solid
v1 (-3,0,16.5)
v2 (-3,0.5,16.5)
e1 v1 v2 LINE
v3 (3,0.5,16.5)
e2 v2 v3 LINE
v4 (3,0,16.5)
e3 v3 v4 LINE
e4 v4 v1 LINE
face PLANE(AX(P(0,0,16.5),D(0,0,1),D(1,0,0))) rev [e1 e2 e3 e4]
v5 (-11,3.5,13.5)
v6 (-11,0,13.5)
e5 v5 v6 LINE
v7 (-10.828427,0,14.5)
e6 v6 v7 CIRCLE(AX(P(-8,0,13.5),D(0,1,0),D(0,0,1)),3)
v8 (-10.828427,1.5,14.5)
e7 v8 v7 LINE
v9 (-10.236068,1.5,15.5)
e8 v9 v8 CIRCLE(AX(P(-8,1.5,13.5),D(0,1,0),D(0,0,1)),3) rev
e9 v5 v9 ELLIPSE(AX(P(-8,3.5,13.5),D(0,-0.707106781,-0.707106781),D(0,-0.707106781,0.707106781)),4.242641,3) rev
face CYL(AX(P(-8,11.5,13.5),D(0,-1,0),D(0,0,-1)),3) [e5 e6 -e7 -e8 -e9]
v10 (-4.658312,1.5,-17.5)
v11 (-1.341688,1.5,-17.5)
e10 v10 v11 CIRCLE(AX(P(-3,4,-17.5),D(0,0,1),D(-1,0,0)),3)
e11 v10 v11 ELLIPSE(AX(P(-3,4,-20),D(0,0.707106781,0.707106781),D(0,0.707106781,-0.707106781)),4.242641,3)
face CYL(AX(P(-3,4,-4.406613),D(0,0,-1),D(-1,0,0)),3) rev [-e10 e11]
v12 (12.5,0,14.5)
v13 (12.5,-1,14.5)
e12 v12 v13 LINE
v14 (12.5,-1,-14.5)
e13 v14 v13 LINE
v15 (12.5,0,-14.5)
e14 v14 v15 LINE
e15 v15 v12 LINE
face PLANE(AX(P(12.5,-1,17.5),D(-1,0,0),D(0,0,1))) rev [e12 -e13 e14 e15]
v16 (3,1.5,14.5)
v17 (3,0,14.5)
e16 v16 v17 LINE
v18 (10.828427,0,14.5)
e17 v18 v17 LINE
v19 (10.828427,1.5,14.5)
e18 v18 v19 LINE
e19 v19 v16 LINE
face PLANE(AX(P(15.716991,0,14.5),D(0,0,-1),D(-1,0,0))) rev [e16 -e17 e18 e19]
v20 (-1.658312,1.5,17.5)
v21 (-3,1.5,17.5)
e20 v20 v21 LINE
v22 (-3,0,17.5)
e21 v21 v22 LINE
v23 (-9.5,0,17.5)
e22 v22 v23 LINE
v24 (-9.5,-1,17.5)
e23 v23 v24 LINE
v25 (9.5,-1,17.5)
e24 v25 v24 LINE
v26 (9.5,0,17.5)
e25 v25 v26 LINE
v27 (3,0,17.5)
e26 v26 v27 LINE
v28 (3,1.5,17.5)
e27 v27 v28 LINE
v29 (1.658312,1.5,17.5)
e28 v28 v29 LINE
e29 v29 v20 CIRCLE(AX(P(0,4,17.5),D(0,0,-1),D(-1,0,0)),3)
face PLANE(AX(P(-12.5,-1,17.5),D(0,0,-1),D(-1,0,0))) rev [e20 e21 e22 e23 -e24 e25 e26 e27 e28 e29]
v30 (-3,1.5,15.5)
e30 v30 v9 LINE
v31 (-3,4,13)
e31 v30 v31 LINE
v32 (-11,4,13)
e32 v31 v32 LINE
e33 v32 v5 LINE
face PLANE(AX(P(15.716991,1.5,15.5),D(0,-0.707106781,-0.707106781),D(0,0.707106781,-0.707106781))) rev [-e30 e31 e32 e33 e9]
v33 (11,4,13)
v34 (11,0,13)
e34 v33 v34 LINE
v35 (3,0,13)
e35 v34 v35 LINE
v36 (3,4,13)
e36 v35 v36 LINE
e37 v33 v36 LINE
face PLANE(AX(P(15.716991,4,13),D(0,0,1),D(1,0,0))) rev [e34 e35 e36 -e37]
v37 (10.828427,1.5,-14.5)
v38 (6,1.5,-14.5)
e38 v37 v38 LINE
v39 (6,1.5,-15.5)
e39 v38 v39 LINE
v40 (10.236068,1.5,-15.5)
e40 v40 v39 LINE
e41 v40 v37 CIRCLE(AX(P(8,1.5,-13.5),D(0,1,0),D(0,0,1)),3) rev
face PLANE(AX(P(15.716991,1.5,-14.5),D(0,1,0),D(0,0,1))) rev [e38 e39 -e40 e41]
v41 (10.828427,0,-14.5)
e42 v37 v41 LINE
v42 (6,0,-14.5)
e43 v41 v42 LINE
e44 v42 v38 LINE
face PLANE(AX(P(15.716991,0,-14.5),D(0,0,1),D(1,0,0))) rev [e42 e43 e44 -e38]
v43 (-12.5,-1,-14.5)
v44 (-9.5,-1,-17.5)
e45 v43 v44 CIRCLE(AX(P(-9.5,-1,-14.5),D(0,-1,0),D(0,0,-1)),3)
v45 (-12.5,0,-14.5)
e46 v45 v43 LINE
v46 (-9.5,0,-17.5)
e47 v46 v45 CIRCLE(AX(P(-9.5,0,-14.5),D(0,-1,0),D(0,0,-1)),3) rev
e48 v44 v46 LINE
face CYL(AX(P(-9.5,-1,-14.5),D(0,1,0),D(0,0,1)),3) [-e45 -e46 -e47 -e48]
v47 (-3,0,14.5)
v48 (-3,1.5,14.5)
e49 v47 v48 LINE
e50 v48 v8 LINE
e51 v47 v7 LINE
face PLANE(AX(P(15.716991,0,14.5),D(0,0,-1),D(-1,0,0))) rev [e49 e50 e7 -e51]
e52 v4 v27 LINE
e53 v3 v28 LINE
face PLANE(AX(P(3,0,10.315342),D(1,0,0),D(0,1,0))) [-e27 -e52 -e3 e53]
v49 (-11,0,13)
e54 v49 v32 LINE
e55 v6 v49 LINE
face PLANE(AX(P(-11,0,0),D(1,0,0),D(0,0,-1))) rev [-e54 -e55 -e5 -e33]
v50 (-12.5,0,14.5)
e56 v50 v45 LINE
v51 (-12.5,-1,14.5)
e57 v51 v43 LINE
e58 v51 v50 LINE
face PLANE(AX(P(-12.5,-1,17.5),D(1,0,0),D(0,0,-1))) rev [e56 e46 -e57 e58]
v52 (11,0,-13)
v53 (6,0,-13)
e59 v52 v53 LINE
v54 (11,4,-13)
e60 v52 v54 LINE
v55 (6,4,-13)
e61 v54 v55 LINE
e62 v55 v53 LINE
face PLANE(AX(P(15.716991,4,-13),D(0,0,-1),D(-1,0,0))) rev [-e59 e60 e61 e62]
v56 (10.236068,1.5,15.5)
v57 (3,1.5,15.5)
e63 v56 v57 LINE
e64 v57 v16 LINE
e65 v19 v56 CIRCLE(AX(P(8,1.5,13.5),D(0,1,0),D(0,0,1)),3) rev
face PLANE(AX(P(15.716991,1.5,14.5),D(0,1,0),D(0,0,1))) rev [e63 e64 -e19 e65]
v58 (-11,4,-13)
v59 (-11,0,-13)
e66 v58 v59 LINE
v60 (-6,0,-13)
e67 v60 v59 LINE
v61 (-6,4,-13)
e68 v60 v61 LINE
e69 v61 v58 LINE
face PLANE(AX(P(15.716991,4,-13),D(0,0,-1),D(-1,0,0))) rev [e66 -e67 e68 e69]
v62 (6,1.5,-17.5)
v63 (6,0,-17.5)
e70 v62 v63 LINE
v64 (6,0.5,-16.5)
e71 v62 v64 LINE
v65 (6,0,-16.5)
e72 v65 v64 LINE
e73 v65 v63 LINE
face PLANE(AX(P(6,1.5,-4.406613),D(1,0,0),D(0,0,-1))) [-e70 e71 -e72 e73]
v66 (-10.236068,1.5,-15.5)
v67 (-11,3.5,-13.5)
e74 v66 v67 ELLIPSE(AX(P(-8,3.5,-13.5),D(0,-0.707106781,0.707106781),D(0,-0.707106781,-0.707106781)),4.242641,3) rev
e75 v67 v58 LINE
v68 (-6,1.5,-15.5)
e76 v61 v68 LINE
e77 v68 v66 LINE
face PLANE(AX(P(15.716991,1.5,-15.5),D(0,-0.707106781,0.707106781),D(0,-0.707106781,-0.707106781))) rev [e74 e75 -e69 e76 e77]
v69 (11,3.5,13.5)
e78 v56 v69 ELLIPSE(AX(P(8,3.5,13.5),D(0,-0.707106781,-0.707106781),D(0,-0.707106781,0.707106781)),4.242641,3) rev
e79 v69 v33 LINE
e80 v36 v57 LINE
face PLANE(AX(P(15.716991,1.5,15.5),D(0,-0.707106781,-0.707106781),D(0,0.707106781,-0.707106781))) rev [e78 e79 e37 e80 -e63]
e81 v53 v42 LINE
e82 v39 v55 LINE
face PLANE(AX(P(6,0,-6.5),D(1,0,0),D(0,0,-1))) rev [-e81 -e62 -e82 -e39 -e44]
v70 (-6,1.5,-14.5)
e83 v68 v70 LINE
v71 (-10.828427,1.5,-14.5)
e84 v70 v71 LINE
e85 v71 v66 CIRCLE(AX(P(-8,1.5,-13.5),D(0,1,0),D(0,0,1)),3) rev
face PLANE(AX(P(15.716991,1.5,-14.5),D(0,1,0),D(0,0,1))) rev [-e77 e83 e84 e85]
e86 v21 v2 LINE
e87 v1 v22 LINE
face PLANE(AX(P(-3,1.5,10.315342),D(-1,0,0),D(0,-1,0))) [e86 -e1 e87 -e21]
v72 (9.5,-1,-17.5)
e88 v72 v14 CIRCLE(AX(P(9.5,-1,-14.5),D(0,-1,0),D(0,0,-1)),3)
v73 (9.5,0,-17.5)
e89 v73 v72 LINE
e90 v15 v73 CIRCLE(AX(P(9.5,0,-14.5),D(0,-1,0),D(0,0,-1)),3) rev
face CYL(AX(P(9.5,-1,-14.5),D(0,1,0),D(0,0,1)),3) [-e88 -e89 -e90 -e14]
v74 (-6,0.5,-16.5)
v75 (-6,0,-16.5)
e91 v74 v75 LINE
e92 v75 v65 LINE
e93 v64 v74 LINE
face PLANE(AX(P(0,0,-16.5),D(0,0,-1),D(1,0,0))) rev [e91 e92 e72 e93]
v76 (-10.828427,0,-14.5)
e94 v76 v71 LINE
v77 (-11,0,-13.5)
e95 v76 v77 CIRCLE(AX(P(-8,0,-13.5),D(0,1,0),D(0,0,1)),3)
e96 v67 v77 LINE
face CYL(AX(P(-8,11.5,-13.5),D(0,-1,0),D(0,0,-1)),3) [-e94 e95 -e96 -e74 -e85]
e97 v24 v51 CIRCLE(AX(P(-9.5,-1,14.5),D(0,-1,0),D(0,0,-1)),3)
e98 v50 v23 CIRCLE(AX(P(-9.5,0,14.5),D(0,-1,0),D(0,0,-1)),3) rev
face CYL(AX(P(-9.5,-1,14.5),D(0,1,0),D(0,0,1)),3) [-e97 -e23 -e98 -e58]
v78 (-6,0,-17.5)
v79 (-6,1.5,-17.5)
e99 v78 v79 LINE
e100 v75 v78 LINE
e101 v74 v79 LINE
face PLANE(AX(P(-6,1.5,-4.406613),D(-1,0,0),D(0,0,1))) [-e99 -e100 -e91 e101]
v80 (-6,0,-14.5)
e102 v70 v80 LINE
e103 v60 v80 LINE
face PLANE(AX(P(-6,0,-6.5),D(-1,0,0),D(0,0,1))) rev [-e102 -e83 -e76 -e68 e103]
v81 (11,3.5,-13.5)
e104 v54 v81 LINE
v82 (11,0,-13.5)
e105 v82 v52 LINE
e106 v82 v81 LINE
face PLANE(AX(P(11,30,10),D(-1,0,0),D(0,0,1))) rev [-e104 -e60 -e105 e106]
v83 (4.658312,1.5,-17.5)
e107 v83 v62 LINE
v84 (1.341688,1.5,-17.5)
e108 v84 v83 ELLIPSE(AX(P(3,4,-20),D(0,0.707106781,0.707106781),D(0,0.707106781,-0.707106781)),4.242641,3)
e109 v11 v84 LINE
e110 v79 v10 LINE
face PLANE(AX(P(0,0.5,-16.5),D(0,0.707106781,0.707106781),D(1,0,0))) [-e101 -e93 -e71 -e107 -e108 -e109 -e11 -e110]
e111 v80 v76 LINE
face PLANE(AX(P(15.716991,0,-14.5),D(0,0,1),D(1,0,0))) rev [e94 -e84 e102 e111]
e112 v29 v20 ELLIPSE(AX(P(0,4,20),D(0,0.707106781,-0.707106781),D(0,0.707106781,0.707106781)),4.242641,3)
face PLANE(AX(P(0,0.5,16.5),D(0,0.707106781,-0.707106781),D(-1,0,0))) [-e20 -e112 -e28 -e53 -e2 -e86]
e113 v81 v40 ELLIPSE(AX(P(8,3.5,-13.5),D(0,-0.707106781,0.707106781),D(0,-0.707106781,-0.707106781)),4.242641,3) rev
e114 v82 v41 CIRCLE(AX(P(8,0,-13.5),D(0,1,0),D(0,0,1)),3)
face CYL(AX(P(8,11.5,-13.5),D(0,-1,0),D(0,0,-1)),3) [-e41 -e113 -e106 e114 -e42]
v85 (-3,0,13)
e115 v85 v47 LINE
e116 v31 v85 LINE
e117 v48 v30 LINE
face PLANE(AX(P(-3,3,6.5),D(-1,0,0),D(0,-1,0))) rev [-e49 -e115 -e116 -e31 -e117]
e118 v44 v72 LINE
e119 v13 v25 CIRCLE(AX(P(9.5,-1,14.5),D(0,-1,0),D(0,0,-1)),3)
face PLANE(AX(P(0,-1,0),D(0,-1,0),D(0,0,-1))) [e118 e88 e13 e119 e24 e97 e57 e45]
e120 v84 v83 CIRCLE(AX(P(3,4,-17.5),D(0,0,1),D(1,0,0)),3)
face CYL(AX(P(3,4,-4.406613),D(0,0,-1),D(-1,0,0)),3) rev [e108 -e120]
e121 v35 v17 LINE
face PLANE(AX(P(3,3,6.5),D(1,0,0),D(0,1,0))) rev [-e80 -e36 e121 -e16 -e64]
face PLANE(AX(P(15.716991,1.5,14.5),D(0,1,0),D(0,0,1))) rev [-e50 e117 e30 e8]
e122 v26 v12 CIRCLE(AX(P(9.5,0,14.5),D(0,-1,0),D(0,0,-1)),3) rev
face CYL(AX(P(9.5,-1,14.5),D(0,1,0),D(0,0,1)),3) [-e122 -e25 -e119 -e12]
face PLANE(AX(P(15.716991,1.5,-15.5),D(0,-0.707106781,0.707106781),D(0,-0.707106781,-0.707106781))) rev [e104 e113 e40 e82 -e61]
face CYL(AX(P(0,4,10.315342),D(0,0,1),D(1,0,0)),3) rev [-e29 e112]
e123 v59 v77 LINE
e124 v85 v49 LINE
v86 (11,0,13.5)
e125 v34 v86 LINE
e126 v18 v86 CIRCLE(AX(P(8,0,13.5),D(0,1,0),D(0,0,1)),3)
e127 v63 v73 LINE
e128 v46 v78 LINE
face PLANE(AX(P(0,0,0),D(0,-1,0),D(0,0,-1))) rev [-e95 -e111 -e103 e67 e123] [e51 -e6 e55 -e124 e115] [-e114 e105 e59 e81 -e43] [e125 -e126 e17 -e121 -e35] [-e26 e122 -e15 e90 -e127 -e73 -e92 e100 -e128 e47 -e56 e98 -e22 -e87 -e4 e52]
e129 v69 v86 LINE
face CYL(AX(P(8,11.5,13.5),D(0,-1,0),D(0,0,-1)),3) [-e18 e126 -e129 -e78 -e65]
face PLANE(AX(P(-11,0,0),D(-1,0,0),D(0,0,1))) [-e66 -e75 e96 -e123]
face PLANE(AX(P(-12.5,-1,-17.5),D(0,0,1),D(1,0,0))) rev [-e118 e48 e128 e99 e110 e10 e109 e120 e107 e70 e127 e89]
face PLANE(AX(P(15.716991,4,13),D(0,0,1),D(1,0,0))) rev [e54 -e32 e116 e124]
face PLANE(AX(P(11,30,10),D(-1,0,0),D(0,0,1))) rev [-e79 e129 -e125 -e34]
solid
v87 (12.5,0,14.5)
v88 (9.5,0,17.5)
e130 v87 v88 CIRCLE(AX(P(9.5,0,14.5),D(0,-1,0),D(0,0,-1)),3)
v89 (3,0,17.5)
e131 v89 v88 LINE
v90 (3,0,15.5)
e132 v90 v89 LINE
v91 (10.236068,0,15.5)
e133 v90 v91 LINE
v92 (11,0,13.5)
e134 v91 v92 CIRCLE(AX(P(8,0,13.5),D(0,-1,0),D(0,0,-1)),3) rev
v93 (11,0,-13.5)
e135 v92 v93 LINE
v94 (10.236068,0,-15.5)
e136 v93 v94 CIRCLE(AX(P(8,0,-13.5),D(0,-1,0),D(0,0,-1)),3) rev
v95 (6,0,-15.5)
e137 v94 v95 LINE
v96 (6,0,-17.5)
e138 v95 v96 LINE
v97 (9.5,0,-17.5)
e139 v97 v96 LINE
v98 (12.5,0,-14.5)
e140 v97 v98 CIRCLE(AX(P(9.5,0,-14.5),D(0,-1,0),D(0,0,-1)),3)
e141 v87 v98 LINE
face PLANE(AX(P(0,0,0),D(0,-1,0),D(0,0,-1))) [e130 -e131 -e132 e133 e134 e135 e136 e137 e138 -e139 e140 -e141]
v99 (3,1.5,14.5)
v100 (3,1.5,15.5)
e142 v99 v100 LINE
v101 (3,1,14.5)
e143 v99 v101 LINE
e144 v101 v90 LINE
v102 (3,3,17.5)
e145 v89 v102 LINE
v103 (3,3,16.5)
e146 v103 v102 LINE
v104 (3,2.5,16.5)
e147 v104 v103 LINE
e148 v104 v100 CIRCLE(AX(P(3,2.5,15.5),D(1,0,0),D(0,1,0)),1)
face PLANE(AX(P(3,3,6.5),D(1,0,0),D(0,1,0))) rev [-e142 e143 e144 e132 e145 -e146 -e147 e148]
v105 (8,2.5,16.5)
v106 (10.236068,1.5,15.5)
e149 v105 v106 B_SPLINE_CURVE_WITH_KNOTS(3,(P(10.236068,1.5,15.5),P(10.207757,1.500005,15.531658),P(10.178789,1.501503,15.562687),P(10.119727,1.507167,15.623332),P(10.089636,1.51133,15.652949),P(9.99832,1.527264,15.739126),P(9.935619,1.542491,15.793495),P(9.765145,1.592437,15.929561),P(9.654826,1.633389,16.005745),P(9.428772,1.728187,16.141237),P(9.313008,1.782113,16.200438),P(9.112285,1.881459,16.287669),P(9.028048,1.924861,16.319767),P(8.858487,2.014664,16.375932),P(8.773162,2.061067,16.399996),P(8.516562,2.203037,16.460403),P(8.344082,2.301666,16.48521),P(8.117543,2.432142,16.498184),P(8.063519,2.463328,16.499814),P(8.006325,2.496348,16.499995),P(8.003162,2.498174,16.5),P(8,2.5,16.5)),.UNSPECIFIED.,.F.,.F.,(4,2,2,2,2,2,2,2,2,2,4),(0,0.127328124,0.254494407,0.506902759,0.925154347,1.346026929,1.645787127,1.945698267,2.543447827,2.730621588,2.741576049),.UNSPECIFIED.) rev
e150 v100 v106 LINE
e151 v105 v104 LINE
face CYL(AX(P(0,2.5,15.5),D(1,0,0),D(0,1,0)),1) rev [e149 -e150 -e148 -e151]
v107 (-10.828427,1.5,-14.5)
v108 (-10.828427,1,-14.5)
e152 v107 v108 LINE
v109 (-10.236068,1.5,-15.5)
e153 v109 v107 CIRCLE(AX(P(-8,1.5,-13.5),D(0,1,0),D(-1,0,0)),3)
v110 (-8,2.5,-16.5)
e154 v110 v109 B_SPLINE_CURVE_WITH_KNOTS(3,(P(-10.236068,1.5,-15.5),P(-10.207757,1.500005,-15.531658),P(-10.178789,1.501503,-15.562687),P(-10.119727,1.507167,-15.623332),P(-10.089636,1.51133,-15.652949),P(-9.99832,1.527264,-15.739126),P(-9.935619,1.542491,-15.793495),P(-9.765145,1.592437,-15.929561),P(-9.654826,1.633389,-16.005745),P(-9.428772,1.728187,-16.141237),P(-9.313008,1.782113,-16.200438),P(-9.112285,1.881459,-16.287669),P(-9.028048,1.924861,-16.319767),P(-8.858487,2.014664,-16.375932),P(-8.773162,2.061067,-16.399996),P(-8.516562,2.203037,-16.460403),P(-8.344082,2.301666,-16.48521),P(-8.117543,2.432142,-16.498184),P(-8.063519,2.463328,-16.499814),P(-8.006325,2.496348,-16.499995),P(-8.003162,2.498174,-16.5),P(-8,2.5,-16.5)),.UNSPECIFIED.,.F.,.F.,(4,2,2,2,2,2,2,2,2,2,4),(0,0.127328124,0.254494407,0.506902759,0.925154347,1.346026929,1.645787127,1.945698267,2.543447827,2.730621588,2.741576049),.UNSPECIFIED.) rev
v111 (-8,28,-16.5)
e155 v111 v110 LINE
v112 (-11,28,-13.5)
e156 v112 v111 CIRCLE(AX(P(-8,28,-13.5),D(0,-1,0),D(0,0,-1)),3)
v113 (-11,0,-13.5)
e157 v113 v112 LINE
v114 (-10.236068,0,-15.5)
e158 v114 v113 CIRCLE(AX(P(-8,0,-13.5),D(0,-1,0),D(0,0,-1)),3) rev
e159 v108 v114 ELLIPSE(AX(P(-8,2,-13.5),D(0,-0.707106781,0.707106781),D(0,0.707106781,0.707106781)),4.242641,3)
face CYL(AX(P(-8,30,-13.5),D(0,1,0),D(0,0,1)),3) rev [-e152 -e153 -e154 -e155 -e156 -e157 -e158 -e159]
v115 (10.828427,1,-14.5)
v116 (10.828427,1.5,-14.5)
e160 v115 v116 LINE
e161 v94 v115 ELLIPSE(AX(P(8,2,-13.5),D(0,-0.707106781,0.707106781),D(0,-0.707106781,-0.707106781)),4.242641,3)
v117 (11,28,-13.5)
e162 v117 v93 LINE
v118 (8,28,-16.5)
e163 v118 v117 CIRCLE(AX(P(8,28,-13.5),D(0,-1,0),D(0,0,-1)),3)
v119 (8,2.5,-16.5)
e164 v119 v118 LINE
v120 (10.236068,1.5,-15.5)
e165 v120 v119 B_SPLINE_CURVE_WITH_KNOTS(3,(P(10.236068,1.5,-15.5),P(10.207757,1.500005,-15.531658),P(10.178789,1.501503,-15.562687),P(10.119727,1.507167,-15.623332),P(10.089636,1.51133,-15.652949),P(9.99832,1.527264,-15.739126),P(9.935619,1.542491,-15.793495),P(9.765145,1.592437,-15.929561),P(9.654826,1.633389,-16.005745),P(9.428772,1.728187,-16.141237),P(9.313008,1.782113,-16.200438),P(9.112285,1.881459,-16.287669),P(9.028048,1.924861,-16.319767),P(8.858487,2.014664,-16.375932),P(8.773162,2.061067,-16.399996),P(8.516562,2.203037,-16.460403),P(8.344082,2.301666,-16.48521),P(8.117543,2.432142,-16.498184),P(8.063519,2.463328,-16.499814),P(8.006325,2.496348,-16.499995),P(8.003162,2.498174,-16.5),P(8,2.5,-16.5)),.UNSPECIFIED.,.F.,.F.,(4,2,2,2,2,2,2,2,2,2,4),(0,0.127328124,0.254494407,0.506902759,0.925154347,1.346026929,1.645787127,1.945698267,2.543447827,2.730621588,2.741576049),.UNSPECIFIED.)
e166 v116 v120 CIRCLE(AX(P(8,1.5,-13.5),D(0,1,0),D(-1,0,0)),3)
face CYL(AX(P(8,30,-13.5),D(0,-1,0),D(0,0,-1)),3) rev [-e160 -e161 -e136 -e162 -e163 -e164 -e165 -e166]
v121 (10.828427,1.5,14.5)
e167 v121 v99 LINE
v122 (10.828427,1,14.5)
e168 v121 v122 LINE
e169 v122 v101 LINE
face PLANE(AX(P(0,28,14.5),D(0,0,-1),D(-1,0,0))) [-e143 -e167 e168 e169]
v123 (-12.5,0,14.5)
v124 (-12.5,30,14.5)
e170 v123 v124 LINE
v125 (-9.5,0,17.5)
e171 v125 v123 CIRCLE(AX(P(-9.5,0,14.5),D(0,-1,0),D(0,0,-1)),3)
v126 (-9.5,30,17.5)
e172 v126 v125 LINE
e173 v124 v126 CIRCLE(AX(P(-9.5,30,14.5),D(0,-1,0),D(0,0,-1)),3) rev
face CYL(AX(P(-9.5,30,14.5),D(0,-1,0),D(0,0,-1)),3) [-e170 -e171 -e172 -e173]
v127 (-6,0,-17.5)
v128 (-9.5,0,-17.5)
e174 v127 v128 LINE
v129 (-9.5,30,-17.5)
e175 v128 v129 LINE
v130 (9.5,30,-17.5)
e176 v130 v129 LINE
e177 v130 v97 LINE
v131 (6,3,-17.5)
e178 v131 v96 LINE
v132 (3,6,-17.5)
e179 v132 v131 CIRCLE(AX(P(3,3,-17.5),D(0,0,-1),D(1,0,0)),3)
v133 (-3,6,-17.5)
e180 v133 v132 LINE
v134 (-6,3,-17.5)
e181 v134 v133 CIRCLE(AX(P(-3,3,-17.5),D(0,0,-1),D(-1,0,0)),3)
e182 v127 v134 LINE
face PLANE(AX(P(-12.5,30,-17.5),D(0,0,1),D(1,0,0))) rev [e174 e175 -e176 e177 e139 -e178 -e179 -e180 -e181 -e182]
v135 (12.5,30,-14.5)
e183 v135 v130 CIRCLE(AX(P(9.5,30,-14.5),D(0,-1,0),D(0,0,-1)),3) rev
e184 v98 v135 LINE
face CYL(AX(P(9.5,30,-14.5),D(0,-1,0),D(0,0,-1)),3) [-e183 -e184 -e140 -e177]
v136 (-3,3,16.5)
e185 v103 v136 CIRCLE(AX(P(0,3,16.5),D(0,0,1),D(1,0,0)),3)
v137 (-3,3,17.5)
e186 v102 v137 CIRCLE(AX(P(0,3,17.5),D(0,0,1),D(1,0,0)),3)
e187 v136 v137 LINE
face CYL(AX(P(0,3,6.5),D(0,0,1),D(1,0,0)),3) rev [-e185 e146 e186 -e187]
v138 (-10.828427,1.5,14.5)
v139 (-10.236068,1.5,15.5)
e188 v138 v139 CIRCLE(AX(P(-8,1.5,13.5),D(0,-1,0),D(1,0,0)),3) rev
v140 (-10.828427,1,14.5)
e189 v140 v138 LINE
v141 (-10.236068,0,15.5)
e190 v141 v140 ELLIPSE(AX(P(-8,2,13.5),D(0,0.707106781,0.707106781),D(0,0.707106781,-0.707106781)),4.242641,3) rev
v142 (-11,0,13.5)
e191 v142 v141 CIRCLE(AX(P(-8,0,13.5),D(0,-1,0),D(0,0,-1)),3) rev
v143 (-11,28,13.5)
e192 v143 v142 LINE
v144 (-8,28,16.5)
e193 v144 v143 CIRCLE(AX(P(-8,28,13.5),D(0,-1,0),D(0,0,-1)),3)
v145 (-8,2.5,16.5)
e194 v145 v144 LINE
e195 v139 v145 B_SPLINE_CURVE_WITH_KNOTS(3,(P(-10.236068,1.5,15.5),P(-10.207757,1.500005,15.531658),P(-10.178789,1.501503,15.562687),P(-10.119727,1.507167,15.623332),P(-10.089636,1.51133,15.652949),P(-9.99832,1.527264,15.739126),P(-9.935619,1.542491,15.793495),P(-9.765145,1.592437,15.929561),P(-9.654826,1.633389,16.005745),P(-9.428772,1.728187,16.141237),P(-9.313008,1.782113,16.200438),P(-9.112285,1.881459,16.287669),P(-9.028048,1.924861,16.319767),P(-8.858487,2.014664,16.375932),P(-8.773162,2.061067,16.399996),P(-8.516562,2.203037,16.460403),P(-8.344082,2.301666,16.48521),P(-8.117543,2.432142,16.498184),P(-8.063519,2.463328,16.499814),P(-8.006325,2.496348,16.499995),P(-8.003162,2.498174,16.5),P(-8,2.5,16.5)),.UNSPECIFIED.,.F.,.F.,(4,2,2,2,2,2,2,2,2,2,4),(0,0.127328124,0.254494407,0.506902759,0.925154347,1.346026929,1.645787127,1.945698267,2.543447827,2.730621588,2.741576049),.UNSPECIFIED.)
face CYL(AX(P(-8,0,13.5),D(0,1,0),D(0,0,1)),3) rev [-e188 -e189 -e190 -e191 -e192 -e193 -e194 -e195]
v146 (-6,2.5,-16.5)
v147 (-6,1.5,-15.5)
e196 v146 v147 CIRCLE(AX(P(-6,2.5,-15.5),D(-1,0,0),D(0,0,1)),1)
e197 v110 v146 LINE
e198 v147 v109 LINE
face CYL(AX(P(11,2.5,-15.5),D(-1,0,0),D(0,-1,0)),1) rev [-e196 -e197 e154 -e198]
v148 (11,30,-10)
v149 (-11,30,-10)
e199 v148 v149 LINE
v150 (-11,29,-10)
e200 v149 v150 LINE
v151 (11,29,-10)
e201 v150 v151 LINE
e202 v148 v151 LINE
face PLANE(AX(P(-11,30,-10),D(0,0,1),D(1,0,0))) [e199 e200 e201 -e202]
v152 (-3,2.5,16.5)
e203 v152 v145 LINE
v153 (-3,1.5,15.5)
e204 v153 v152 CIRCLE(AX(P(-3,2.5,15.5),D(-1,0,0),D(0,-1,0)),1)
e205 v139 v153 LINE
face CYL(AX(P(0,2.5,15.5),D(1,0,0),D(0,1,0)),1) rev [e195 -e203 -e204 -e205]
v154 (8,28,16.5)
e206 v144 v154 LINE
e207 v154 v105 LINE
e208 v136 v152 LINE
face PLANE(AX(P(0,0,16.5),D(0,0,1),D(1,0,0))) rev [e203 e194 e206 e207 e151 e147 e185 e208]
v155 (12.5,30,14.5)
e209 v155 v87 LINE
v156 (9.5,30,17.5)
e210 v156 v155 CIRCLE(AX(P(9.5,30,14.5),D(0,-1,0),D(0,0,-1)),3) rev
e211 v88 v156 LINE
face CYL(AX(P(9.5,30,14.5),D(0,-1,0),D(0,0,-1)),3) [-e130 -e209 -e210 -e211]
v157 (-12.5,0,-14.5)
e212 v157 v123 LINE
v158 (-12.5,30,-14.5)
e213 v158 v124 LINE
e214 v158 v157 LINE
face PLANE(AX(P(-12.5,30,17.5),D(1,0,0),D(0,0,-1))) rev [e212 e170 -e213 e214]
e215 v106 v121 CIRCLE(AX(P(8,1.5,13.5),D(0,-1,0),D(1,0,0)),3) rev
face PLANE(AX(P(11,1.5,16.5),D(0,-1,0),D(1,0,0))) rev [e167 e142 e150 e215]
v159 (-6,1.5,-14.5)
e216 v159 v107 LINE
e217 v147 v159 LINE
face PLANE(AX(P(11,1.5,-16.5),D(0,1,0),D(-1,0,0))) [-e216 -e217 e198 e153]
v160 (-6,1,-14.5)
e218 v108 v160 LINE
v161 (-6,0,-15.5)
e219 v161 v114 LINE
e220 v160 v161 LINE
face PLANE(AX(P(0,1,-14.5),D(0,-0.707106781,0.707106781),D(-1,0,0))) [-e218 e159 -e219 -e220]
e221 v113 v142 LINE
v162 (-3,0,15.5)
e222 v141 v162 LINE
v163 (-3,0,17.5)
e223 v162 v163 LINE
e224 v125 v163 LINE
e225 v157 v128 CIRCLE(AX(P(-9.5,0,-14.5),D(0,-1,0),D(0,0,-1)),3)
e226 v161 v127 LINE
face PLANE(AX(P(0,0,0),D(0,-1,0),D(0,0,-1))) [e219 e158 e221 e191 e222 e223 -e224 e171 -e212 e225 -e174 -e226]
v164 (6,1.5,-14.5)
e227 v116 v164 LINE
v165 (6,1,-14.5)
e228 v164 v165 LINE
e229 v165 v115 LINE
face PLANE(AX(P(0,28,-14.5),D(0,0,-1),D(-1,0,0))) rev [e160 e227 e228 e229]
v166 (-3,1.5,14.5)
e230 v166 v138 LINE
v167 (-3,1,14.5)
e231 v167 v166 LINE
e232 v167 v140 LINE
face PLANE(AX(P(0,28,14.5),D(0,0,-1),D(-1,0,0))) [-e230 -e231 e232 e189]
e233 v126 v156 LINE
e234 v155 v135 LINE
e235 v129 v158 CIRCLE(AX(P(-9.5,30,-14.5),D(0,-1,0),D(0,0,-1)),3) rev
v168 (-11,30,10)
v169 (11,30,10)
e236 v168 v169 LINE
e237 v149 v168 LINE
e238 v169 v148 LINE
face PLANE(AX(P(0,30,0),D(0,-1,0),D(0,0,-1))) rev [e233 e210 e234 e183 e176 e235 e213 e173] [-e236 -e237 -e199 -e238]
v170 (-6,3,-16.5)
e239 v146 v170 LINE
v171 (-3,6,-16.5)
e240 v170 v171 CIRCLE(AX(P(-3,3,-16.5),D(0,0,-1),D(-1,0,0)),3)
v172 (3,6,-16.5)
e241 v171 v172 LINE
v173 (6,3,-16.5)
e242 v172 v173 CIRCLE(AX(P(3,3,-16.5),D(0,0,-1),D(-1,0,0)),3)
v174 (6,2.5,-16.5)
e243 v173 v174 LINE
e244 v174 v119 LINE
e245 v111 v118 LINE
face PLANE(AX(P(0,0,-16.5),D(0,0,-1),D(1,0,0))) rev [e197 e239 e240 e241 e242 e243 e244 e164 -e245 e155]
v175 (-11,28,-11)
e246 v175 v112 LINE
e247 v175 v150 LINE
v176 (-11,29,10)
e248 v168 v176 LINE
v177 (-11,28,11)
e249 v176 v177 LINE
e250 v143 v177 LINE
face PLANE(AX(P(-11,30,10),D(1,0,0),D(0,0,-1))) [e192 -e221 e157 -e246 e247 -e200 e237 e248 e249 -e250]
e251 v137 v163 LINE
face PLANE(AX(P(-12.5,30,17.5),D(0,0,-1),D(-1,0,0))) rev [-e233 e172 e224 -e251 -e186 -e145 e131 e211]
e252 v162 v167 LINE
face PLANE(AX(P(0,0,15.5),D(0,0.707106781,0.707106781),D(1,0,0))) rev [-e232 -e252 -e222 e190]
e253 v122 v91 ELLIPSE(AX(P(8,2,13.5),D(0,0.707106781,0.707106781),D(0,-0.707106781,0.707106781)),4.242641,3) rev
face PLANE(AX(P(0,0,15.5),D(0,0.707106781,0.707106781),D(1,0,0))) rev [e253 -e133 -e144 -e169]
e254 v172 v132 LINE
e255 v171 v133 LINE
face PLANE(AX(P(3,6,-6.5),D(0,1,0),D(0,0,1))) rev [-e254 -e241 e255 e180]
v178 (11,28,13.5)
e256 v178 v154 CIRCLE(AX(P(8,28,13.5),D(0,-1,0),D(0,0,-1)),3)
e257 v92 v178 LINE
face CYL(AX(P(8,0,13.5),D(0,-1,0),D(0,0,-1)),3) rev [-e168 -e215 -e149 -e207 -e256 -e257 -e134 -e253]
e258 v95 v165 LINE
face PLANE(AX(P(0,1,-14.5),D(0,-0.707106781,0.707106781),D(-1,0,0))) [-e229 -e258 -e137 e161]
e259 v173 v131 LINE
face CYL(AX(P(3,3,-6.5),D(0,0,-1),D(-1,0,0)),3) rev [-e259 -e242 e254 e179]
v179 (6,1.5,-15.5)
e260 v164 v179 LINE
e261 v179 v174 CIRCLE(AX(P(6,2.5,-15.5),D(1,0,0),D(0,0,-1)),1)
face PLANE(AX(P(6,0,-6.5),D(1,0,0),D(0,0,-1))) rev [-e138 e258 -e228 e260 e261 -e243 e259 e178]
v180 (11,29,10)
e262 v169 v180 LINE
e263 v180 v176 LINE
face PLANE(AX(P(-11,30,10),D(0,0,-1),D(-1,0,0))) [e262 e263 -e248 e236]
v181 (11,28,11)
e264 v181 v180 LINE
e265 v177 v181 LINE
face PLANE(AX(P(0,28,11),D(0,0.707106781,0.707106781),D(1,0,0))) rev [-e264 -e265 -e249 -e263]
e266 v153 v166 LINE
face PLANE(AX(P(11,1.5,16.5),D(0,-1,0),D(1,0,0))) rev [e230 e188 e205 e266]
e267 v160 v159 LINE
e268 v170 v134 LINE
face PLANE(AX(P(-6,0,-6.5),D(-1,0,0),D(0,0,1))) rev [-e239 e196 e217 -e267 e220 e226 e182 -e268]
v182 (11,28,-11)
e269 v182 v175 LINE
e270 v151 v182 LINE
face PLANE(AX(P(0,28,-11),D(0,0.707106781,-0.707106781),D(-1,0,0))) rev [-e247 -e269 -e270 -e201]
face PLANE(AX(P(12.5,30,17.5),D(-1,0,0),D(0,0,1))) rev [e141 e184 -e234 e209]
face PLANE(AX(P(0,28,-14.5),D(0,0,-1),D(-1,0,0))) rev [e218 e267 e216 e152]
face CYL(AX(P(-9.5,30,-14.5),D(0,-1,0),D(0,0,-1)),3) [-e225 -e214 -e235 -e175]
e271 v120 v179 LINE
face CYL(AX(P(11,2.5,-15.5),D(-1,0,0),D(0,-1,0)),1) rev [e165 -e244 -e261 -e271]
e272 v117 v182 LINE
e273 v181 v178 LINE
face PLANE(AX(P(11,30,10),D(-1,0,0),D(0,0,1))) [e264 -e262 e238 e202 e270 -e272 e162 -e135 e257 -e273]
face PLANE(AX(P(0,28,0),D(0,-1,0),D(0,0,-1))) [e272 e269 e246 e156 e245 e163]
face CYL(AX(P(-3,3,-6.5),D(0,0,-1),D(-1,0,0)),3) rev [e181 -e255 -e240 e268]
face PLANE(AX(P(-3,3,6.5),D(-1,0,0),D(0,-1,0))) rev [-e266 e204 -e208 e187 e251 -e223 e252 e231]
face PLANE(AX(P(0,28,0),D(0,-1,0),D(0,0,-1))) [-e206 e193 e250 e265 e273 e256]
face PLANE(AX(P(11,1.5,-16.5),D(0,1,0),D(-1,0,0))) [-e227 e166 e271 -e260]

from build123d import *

# Parameters (mm, degrees)
SZKIC1_W                      = 25
SZKIC1_H                      = 35
SZKIC1_W_2                    = 22
SZKIC1_H_2                    = 20
DODANIE_WYCI_GNI_CIE1_DEPTH   = 30
SZKIC2_W                      = 22
SZKIC2_H                      = 4.5
WYTNIJ_WYCI_GNI_CIE1_DEPTH    = 28
SZKIC5_W                      = 22
SZKIC5_H                      = 26.5
WYTNIJ_WYCI_GNI_CIE2_DEPTH    = 2
DODANIE_WYCI_GNI_CIE2_DEPTH   = 22
DODANIE_WYCI_GNI_CIE2_2_DEPTH = 22
SZKIC7_W                      = 25
SZKIC7_H                      = 35
DODANIE_WYCI_GNI_CIE3_DEPTH   = 1
WYTNIJ_WYCI_GNI_CIE3_DEPTH    = 11
WYTNIJ_WYCI_GNI_CIE4_DEPTH    = 11
SZKIC10_W                     = 12
SZKIC10_H                     = 6.631969937
SZKIC10_W_2                   = 6
SZKIC10_H_2                   = 4.921641175
WYTNIJ_WYCI_GNI_CIE5_DEPTH    = 11
DODANIE_WYCI_GNI_CIE5_DEPTH   = 1
DODANIE_WYCI_GNI_CIE6_DEPTH   = 1
SFAZOWANIE1_SIZE              = 1
SFAZOWANIE2_SIZE              = 1
ZAOKR_GLENIE1_R               = 1
ZAOKR_GLENIE2_R               = 3
ZAOKR_GLENIE3_R               = 3
SFAZOWANIE3_SIZE              = 1
ZAOKR_GLENIE4_DEPTH           = 29
WYTNIJ_WYCI_GNI_CIE7_DEPTH    = 4


with BuildPart() as part:
    # Szkic1 → Dodanie-wyciągnięcie1 (new body)
    with BuildSketch(Plane(origin=(0, 0, 0), x_dir=(1, 0, 0), z_dir=(0, 1, 0))):
        Rectangle(SZKIC1_W, SZKIC1_H)
        Rectangle(SZKIC1_W_2, SZKIC1_H_2, mode=Mode.SUBTRACT)
    extrude(amount=DODANIE_WYCI_GNI_CIE1_DEPTH)

    # Szkic2 → Wytnij-wyciągnięcie1 (cut)
    with BuildSketch(Plane.XZ):
        with Locations((0, 12.25)):
            Rectangle(SZKIC2_W, SZKIC2_H)
        with Locations((0, -12.25)):
            Rectangle(SZKIC2_W, SZKIC2_H)
    extrude(amount=-WYTNIJ_WYCI_GNI_CIE1_DEPTH, mode=Mode.SUBTRACT)

    # Szkic5 → Wytnij-wyciągnięcie2 (cut)
    with BuildSketch(Plane(origin=(0, 0, 14.5), x_dir=(-1, 0, 0), z_dir=(0, 0, -1))):
        with Locations((0, 14.75)):
            Rectangle(SZKIC5_W, SZKIC5_H)
    wytnij_wyci_gni_cie2 = extrude(amount=-WYTNIJ_WYCI_GNI_CIE2_DEPTH, mode=Mode.SUBTRACT)

    # Lustro1: Wytnij-wyciągnięcie2 across plane
    add(wytnij_wyci_gni_cie2.mirror(Plane.XY), mode=Mode.SUBTRACT)


with BuildPart() as body_2:
    # Szkic6 → Dodanie-wyciągnięcie2 (new body)
    with BuildSketch(Plane(origin=(-11, 0, 0), x_dir=(0, 0, -1), z_dir=(1, 0, 0))):
        Polygon((-14.5, 1.5), (-15.5, 1.5), (-13, 4), (-13, 0), (-14.5, 0), align=None)
    extrude(amount=DODANIE_WYCI_GNI_CIE2_DEPTH)



with BuildPart() as body_3:
    # Szkic6 → Dodanie-wyci_gni_cie2 2 (new body)
    with BuildSketch(Plane(origin=(-11, 0, 0), x_dir=(0, 0, -1), z_dir=(1, 0, 0))):
        Polygon((14.5, 1.5), (15.5, 1.5), (13, 4), (13, 0), (14.5, 0), align=None)
    extrude(amount=DODANIE_WYCI_GNI_CIE2_2_DEPTH)


with BuildPart() as body_2_1:
    add(body_2.part)

    add(body_3.part)  # Dodanie-wyciągnięcie3 merges body 3
    # Szkic7 → Dodanie-wyciągnięcie3 (add)
    with BuildSketch(Plane.XZ):
        Rectangle(SZKIC7_W, SZKIC7_H)
    extrude(amount=DODANIE_WYCI_GNI_CIE3_DEPTH)


with BuildPart() as wytnij_wyci_gni_cie3_tool:
    # Szkic8 → Wytnij-wyciągnięcie3 (new body)
    with BuildSketch(Plane.XY.offset(17.5)):
        with BuildLine():
            Line((3, 3), (3, 0))
            Line((3, 0), (-3, 0))
            Line((-3, 0), (-3, 3))
            ThreePointArc((-3, 3), (0, 6), (3, 3))
        make_face()
    extrude(amount=-WYTNIJ_WYCI_GNI_CIE3_DEPTH)


with BuildPart() as part_1:
    add(part.part)

    # Wytnij-wyciągnięcie3: cut by wytnij_wyci_gni_cie3_tool
    add(wytnij_wyci_gni_cie3_tool.part, mode=Mode.SUBTRACT)


with BuildPart() as body_2_2:
    add(body_2_1.part)

    # Wytnij-wyciągnięcie3: cut by wytnij_wyci_gni_cie3_tool
    add(wytnij_wyci_gni_cie3_tool.part, mode=Mode.SUBTRACT)


with BuildPart() as wytnij_wyci_gni_cie4_tool:
    # Szkic9 → Wytnij-wyciągnięcie4 (new body)
    with BuildSketch(Plane(origin=(0, 0, -17.5), x_dir=(-1, 0, 0), z_dir=(0, 0, -1))):
        with BuildLine():
            Line((-6, 0), (-6, 3))
            ThreePointArc((-6, 3), (-5.121320344, 5.121320344), (-3, 6))
            Line((-3, 6), (3, 6))
            ThreePointArc((3, 6), (5.121320344, 5.121320344), (6, 3))
            Line((6, 3), (6, 0))
            Line((6, 0), (-6, 0))
        make_face()
    extrude(amount=-WYTNIJ_WYCI_GNI_CIE4_DEPTH)


with BuildPart() as part_2:
    add(part_1.part)

    # Wytnij-wyciągnięcie4: cut by wytnij_wyci_gni_cie4_tool
    add(wytnij_wyci_gni_cie4_tool.part, mode=Mode.SUBTRACT)

    # Sfazowanie2
    sfazowanie2_edges = [part_2.edges().sort_by_distance(p)[0] for p in [
        (8.5, 0, -14.5),
        (-7, 0, 14.5),
        (-8.5, 0, -14.5),
        (7, 0, 14.5),
    ]]
    chamfer(sfazowanie2_edges, length=SFAZOWANIE2_SIZE)

    # Zaokrąglenie1
    zaokr_glenie1_edges = [part_2.edges().sort_by_distance(p)[0] for p in [
        (-8.5, 1.5, -16.5),
        (7, 1.5, 16.5),
        (8.5, 1.5, -16.5),
        (-7, 1.5, 16.5),
    ]]
    fillet(zaokr_glenie1_edges, radius=ZAOKR_GLENIE1_R)

    # Zaokrąglenie2
    zaokr_glenie2_edges = [part_2.edges().sort_by_distance(p)[0] for p in [
        (12.5, 15, 17.5),
        (-12.5, 15, 17.5),
        (-12.5, 15, -17.5),
        (12.5, 15, -17.5),
    ]]
    fillet(zaokr_glenie2_edges, radius=ZAOKR_GLENIE2_R)

    # Sfazowanie3
    sfazowanie3_edges = [part_2.edges().sort_by_distance(p)[0] for p in [
        (0, 28, 10),
        (0, 28, -10),
    ]]
    chamfer(sfazowanie3_edges, length=SFAZOWANIE3_SIZE)

    # Zaokrąglenie4: read off the stored shape, not the designer's step
    # Zaokrąglenie4 outline → Zaokrąglenie4 (add)
    with BuildSketch(Plane(origin=(0, 0, 0), x_dir=(1, 0, 0), z_dir=(0, 1, 0))):
        with BuildLine():
            Line((11, 16.5), (8, 16.5))
            ThreePointArc((8, 16.5), (10.121320344, 15.621320344), (11, 13.5))
            Line((11, 13.5), (11, 16.5))
        make_face()
        with BuildLine():
            Line((-8, 16.5), (-11, 16.5))
            Line((-11, 16.5), (-11, 13.5))
            ThreePointArc((-11, 13.5), (-10.121320344, 15.621320344), (-8, 16.5))
        make_face()
        with BuildLine():
            ThreePointArc((11, -13.5), (10.121320344, -15.621320344), (8, -16.5))
            Line((8, -16.5), (11, -16.5))
            Line((11, -16.5), (11, -13.5))
        make_face()
        with BuildLine():
            Line((-11, -13.5), (-11, -16.5))
            Line((-11, -16.5), (-8, -16.5))
            ThreePointArc((-8, -16.5), (-10.121320344, -15.621320344), (-11, -13.5))
        make_face()
    extrude(amount=ZAOKR_GLENIE4_DEPTH)


with BuildPart() as body_2_3:
    add(body_2_2.part)

    # Wytnij-wyciągnięcie4: cut by wytnij_wyci_gni_cie4_tool
    add(wytnij_wyci_gni_cie4_tool.part, mode=Mode.SUBTRACT)

    # Szkic10 → Wytnij-wyciągnięcie5 (cut)
    with BuildSketch(Plane(origin=(0, 0, 0), x_dir=(1, 0, 0), z_dir=(0, 1, 0))):
        with Locations((0, 14.184015031)):
            Rectangle(SZKIC10_W, SZKIC10_H)
        with Locations((0, -14.039179413)):
            Rectangle(SZKIC10_W_2, SZKIC10_H_2)
    extrude(amount=WYTNIJ_WYCI_GNI_CIE5_DEPTH, mode=Mode.SUBTRACT)

    # Szkic12 → Dodanie-wyciągnięcie5 (add)
    with BuildSketch(Plane.XY.offset(17.5)):
        with BuildLine():
            Line((3, 0), (-3, 0))
            Line((-3, 0), (-3, 1.5))
            Line((-3, 1.5), (-1.658312395, 1.5))
            ThreePointArc((-1.658312395, 1.5), (0, 1), (1.658312395, 1.5))
            Line((1.658312395, 1.5), (3, 1.5))
            Line((3, 1.5), (3, 0))
        make_face()
    extrude(amount=-DODANIE_WYCI_GNI_CIE5_DEPTH)

    # Szkic13 → Dodanie-wyciągnięcie6 (add)
    with BuildSketch(Plane(origin=(0, 0, -17.5), x_dir=(-1, 0, 0), z_dir=(0, 0, -1))):
        with BuildLine():
            Line((-4.658312395, 1.5), (-6, 1.5))
            Line((-6, 1.5), (-6, 0))
            Line((-6, 0), (6, 0))
            Line((6, 0), (6, 1.5))
            Line((6, 1.5), (4.658312395, 1.5))
            ThreePointArc((4.658312395, 1.5), (3, 1), (1.341687605, 1.5))
            Line((1.341687605, 1.5), (-1.341687605, 1.5))
            ThreePointArc((-1.341687605, 1.5), (-3, 1), (-4.658312395, 1.5))
        make_face()
    extrude(amount=-DODANIE_WYCI_GNI_CIE6_DEPTH)

    # Sfazowanie1
    # the kernel refuses this chamfer: 1 mm, written as the material it takes off along each edge
    with BuildSketch(Plane(origin=(-5.571682988, 1.5, 16.5), x_dir=(0, 0, 1), z_dir=(1, 0, 0)), Plane(origin=(-0.913370593, 1.5, 16.5), x_dir=(0, 0, 1), z_dir=(1, 0, 0)), Plane(origin=(-8.571682988, 1.5, -16.5), x_dir=(0, -1, 0), z_dir=(1, 0, 0)), Plane(origin=(2.086629407, 1.5, -16.5), x_dir=(0, -1, 0), z_dir=(1, 0, 0))) as sfazowanie1_piece_1:
        Polygon((SFAZOWANIE1_SIZE, 0), (0, SFAZOWANIE1_SIZE), (0, 0), align=None)
    extrude(amount=6.485053581, mode=Mode.SUBTRACT)
    with BuildSketch(Plane(origin=(-3.913370593, 1.5, -16.5), x_dir=(0, -1, 0), z_dir=(1, 0, 0))) as sfazowanie1_piece_2:
        Polygon((SFAZOWANIE1_SIZE, 0), (0, SFAZOWANIE1_SIZE), (0, 0), align=None)
    extrude(amount=7.826741186, mode=Mode.SUBTRACT)

    # Zaokrąglenie3
    zaokr_glenie3_edges = [body_2_3.edges().sort_by_distance(p)[0] for p in [
        (-12.5, -0.5, 17.5),
        (-12.5, -0.5, -17.5),
        (12.5, -0.5, -17.5),
        (12.5, -0.5, 17.5),
    ]]
    fillet(zaokr_glenie3_edges, radius=ZAOKR_GLENIE3_R)

    # Wytnij-wyciągnięcie7: read off the stored shape, not the designer's step
    # Wytnij-wyciągnięcie7 outline → Wytnij-wyciągnięcie7 (cut)
    with BuildSketch(Plane(origin=(0, 0, 0), x_dir=(1, 0, 0), z_dir=(0, 1, 0))):
        with BuildLine():
            Line((8.894427189, 17), (10.236067977, 15.5))
            ThreePointArc((10.236067977, 15.5), (10.802517077, 14.570466269), (11, 13.5))
            Line((11, 13.5), (11, 15.5))
            Line((11, 15.5), (10.999999995, 17))
            Line((10.999999995, 17), (8.894427189, 17))
        make_face()
        with BuildLine():
            Line((-10.236067977, 15.5), (-8.894427189, 17))
            Line((-8.894427189, 17), (-10.999999998, 17))
            Line((-10.999999998, 17), (-10.999999995, 15.5))
            Line((-10.999999995, 15.5), (-11, 13.5))
            ThreePointArc((-11, 13.5), (-10.802517077, 14.570466269), (-10.236067977, 15.5))
        make_face()
        with BuildLine():
            Line((11, -15.5), (11, -13.5))
            ThreePointArc((11, -13.5), (10.802517077, -14.570466269), (10.236067977, -15.5))
            Line((10.236067977, -15.5), (8.894427189, -17))
            Line((8.894427189, -17), (10.999999998, -17))
            Line((10.999999998, -17), (11, -15.5))
        make_face()
        with BuildLine():
            Line((-10.999999995, -15.5), (-10.999999995, -17))
            Line((-10.999999995, -17), (-8.894427189, -17))
            Line((-8.894427189, -17), (-10.236067977, -15.5))
            ThreePointArc((-10.236067977, -15.5), (-10.802517077, -14.570466269), (-11, -13.5))
            Line((-11, -13.5), (-10.999999995, -15.5))
        make_face()
    extrude(amount=WYTNIJ_WYCI_GNI_CIE7_DEPTH, mode=Mode.SUBTRACT)


solid = Compound([part_2.part, body_2_3.part])
